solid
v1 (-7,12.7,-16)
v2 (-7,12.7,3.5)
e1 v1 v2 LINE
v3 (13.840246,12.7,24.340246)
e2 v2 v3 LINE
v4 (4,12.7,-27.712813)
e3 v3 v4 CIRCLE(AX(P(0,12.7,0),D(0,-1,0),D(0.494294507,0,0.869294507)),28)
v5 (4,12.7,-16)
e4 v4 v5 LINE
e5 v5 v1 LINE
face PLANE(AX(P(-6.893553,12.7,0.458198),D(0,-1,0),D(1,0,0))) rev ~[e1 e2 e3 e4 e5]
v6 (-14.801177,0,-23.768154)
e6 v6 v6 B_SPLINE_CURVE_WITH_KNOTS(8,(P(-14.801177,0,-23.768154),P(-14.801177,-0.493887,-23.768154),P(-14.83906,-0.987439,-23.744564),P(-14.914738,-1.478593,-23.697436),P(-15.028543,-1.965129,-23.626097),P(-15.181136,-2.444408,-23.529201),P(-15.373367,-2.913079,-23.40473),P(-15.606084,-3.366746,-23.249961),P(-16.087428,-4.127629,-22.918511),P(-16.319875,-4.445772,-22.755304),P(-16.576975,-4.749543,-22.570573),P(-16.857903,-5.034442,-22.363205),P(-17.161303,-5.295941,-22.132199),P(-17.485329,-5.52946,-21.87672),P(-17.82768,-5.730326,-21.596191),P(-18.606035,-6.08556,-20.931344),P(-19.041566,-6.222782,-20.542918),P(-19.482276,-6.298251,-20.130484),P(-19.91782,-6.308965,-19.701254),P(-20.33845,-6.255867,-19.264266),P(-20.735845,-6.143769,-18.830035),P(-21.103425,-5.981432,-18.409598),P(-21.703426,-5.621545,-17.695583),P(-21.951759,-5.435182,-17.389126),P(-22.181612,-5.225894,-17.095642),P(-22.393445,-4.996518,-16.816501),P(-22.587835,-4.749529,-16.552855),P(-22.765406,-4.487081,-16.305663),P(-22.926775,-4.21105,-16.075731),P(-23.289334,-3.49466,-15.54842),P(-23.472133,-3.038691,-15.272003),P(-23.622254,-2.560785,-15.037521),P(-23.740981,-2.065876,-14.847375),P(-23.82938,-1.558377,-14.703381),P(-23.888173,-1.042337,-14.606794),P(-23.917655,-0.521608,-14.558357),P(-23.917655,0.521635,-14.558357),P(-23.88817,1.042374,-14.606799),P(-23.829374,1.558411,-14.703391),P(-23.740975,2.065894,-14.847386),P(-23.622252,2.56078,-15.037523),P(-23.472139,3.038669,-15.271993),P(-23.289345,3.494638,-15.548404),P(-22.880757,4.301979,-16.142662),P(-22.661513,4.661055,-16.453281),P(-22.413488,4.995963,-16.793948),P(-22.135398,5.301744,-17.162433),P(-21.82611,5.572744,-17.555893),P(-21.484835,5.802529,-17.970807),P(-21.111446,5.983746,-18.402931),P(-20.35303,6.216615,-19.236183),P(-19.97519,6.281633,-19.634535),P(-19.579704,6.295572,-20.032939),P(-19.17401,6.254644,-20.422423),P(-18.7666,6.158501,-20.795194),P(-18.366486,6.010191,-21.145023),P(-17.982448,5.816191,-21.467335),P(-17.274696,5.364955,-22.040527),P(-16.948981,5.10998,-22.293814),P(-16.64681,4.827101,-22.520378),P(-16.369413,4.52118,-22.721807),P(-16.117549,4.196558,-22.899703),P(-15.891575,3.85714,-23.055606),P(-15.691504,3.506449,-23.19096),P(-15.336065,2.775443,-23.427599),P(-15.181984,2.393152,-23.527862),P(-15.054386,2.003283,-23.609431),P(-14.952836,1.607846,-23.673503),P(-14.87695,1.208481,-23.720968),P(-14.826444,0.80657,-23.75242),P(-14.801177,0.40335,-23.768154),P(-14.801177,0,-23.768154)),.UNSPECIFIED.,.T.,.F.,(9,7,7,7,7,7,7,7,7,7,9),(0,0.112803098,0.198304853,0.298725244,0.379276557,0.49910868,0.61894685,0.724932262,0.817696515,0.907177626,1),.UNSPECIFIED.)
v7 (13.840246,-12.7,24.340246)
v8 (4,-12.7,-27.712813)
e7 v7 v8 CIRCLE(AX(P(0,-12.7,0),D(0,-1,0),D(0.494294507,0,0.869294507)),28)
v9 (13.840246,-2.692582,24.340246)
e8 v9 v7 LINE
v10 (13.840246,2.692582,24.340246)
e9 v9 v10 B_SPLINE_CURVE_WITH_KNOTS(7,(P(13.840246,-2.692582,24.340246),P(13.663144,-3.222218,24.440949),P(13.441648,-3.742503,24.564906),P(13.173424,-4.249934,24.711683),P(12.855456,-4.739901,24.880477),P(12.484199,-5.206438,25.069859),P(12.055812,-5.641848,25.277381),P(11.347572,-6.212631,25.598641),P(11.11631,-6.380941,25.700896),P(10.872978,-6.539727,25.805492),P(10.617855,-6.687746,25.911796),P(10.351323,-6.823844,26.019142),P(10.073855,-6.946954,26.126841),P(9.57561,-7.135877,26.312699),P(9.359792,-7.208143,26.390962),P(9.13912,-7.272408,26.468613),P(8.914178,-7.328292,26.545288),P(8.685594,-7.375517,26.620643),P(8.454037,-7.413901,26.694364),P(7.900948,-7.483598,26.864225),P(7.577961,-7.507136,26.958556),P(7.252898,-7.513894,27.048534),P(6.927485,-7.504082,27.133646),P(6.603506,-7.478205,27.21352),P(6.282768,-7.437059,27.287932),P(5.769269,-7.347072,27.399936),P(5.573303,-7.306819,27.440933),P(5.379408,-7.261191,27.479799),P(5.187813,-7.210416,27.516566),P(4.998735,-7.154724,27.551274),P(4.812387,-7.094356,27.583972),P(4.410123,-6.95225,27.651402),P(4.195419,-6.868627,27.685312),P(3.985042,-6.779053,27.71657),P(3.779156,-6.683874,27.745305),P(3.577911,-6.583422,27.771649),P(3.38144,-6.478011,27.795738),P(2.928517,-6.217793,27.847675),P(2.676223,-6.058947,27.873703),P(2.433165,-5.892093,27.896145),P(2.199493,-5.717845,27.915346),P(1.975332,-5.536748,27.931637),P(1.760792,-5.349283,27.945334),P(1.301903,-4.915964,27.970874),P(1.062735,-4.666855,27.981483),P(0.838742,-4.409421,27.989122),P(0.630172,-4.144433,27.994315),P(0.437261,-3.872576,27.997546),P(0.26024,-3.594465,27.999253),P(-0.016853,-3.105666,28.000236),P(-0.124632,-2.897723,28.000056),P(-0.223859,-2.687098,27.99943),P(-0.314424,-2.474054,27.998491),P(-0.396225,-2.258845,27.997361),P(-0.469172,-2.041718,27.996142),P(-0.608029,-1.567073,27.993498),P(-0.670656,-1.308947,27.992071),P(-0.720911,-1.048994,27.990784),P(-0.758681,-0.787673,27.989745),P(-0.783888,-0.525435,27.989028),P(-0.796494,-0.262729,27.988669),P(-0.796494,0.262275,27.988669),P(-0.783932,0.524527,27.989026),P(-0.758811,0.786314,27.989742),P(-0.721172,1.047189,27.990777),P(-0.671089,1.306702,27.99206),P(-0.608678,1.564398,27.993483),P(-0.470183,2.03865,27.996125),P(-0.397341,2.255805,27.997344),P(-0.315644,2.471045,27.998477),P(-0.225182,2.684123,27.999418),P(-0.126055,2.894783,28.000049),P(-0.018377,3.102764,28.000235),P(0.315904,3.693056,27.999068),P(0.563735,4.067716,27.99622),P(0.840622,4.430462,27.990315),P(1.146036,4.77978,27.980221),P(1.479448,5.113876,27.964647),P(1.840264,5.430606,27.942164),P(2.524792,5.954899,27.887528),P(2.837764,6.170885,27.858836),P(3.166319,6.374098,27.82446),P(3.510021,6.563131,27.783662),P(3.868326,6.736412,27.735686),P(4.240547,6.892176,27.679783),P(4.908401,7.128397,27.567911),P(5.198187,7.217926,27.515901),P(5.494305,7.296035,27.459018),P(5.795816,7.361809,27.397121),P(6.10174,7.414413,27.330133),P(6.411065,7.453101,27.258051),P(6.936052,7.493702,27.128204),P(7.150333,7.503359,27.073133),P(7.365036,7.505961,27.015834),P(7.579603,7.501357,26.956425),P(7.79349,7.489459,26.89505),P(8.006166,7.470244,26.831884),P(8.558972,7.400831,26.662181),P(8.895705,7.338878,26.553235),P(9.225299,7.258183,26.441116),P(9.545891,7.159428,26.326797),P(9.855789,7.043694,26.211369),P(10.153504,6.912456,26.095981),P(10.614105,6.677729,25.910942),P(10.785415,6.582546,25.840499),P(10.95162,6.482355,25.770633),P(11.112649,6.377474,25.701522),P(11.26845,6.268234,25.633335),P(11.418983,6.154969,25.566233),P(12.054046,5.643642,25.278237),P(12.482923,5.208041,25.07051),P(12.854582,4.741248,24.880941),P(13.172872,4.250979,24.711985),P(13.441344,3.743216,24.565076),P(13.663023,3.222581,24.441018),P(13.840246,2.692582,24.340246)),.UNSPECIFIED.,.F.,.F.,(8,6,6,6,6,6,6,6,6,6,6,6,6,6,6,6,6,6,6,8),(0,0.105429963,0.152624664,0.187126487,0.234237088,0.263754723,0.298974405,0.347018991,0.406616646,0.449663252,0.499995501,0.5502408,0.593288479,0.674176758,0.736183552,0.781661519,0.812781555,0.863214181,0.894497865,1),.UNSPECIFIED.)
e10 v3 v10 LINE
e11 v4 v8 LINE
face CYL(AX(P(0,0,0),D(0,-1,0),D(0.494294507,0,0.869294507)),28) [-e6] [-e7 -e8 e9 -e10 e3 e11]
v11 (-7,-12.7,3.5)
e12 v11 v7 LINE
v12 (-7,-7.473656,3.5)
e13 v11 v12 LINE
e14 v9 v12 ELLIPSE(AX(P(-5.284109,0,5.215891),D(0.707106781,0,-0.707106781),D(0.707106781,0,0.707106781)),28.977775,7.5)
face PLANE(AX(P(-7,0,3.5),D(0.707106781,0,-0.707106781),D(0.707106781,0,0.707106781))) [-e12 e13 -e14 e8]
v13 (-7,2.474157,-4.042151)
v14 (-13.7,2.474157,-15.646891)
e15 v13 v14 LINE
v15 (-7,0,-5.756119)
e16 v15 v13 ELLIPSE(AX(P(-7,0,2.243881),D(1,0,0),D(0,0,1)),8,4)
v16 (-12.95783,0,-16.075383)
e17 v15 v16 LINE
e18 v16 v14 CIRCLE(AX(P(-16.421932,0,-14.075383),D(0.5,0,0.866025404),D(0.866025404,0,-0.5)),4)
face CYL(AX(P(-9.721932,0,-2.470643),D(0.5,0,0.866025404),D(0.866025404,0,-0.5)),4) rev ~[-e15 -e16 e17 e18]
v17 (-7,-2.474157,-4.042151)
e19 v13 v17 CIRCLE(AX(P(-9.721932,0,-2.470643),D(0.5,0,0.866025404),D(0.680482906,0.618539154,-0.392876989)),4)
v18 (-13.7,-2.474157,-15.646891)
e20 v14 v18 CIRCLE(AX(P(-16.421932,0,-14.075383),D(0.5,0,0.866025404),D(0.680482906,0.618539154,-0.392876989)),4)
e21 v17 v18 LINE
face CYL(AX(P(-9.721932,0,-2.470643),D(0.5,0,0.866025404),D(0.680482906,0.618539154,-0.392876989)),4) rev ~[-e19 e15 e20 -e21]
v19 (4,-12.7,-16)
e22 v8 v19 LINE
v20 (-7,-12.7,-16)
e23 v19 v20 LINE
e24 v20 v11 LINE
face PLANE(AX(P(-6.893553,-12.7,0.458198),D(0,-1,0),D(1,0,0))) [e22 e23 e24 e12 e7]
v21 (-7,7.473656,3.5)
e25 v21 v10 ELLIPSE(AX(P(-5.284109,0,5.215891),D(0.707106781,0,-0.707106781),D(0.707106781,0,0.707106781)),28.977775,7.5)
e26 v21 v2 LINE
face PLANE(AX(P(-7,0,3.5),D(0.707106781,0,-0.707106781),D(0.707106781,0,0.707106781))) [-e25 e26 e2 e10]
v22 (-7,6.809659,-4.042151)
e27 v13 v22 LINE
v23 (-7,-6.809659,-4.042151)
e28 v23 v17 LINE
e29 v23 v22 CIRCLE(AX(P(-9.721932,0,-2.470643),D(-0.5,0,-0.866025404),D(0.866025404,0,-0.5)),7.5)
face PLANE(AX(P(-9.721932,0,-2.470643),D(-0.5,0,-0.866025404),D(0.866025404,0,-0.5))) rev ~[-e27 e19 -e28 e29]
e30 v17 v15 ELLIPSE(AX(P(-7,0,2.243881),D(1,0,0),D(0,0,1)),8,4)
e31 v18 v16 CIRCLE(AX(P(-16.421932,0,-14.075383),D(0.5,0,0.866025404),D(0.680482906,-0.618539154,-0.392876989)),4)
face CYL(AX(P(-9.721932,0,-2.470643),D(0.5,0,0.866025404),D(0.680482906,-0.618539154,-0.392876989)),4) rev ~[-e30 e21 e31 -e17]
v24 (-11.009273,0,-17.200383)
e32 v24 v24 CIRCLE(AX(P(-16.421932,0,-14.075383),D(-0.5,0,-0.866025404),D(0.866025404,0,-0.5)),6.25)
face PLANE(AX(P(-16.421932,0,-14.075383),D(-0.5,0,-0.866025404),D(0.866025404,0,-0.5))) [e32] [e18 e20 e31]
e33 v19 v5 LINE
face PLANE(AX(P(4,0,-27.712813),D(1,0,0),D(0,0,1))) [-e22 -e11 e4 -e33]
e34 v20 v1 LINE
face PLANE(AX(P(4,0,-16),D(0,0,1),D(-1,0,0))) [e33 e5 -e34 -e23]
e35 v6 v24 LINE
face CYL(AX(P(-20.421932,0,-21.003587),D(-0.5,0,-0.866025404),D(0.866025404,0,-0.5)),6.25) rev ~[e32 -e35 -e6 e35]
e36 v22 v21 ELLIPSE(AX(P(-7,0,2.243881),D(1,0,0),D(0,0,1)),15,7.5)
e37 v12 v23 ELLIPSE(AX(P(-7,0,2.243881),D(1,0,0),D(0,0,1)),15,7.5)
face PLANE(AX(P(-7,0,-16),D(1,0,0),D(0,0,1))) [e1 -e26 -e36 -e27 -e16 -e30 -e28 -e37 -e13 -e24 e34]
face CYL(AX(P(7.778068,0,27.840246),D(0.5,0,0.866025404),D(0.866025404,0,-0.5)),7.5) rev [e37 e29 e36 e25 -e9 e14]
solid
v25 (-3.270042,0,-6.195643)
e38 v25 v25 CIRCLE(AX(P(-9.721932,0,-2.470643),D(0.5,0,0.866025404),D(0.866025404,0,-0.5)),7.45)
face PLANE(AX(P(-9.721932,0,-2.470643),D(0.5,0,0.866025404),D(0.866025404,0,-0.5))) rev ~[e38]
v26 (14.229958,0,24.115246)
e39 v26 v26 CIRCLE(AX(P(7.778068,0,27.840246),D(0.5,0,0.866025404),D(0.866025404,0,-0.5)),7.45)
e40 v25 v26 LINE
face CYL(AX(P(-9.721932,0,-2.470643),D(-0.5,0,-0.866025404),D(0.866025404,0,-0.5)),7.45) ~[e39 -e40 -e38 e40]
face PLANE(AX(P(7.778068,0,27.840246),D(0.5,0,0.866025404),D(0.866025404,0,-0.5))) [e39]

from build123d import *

# Parameters (mm, degrees)
F1_DEPTH  = 12.7
F3_R      = 7.5
F4_DEPTH  = 35
F6_DEPTH  = 25
F8_R      = 6.25
F9_DEPTH  = 8
F10_R     = 7.45
F11_DEPTH = 35


with BuildPart() as f1:
    # F0 (on Front) → F1 (new body, symmetric)
    with BuildSketch(Plane.XZ):
        with BuildLine():
            Line((-7, 3.5), (13.8402462006, 24.3402462006))
            ThreePointArc((13.8402462006, 24.3402462006), (-27.5127031952, 5.2010732444), (4, -27.7128129211))
            Line((4, -27.7128129211), (4, -16))
            Line((4, -16), (-7, -16))
            Line((-7, -16), (-7, 3.5))
        make_face()
    extrude(amount=F1_DEPTH, both=True)

    # F3 (on face) → F4 (cut)
    with BuildSketch(Plane(origin=(13.9996973222, 0, 24.2481870526), x_dir=(0.8660254038, 0, -0.5), z_dir=(-0.5, 0, -0.8660254038))):
        with Locations((-7.1841182959, 0)):
            Circle(F3_R)
    extrude(amount=F4_DEPTH, mode=Mode.SUBTRACT)

    # F5 (on face) → F6 (cut)
    with BuildSketch(Plane(origin=(-3.5003026778, 0, -6.0627020798), x_dir=(0.8660254038, 0, -0.5), z_dir=(0.5, 0, 0.8660254038))):
        with BuildLine():
            Line((-4.0411023821, -2.474156617), (-4.0411023821, 2.474156617))
            ThreePointArc((-4.0411023821, 2.474156617), (-11.1841182959, 0), (-4.0411023821, -2.474156617))
        make_face()
        with BuildLine():
            ThreePointArc((-4.0411023821, -2.474156617), (-3.4044315592, -1.3091860725), (-3.1841182959, 0))
            ThreePointArc((-3.1841182959, 0), (-3.4044315592, 1.3091860725), (-4.0411023821, 2.474156617))
            Line((-4.0411023821, 2.474156617), (-4.0411023821, -2.474156617))
        make_face()
    extrude(amount=-F6_DEPTH, mode=Mode.SUBTRACT)

    # F8 (on face) → F9 (cut)
    with BuildSketch(Plane(origin=(-14.2003026778, 0, -24.5956457208), x_dir=(0.8660254038, 0, -0.5), z_dir=(-0.5, 0, -0.8660254038))):
        with Locations((-7.1841182959, 0)):
            Circle(F8_R)
    extrude(amount=-F9_DEPTH, mode=Mode.SUBTRACT)


with BuildPart() as f11:
    # F10 (on face) → F11 (new body)
    with BuildSketch(Plane(origin=(-3.5003026778, 0, -6.0627020798), x_dir=(0.8660254038, 0, -0.5), z_dir=(0.5, 0, 0.8660254038))):
        with Locations((-7.1841182959, 0)):
            Circle(F10_R)
    extrude(amount=F11_DEPTH)


solid = Compound([f1.part, f11.part])
